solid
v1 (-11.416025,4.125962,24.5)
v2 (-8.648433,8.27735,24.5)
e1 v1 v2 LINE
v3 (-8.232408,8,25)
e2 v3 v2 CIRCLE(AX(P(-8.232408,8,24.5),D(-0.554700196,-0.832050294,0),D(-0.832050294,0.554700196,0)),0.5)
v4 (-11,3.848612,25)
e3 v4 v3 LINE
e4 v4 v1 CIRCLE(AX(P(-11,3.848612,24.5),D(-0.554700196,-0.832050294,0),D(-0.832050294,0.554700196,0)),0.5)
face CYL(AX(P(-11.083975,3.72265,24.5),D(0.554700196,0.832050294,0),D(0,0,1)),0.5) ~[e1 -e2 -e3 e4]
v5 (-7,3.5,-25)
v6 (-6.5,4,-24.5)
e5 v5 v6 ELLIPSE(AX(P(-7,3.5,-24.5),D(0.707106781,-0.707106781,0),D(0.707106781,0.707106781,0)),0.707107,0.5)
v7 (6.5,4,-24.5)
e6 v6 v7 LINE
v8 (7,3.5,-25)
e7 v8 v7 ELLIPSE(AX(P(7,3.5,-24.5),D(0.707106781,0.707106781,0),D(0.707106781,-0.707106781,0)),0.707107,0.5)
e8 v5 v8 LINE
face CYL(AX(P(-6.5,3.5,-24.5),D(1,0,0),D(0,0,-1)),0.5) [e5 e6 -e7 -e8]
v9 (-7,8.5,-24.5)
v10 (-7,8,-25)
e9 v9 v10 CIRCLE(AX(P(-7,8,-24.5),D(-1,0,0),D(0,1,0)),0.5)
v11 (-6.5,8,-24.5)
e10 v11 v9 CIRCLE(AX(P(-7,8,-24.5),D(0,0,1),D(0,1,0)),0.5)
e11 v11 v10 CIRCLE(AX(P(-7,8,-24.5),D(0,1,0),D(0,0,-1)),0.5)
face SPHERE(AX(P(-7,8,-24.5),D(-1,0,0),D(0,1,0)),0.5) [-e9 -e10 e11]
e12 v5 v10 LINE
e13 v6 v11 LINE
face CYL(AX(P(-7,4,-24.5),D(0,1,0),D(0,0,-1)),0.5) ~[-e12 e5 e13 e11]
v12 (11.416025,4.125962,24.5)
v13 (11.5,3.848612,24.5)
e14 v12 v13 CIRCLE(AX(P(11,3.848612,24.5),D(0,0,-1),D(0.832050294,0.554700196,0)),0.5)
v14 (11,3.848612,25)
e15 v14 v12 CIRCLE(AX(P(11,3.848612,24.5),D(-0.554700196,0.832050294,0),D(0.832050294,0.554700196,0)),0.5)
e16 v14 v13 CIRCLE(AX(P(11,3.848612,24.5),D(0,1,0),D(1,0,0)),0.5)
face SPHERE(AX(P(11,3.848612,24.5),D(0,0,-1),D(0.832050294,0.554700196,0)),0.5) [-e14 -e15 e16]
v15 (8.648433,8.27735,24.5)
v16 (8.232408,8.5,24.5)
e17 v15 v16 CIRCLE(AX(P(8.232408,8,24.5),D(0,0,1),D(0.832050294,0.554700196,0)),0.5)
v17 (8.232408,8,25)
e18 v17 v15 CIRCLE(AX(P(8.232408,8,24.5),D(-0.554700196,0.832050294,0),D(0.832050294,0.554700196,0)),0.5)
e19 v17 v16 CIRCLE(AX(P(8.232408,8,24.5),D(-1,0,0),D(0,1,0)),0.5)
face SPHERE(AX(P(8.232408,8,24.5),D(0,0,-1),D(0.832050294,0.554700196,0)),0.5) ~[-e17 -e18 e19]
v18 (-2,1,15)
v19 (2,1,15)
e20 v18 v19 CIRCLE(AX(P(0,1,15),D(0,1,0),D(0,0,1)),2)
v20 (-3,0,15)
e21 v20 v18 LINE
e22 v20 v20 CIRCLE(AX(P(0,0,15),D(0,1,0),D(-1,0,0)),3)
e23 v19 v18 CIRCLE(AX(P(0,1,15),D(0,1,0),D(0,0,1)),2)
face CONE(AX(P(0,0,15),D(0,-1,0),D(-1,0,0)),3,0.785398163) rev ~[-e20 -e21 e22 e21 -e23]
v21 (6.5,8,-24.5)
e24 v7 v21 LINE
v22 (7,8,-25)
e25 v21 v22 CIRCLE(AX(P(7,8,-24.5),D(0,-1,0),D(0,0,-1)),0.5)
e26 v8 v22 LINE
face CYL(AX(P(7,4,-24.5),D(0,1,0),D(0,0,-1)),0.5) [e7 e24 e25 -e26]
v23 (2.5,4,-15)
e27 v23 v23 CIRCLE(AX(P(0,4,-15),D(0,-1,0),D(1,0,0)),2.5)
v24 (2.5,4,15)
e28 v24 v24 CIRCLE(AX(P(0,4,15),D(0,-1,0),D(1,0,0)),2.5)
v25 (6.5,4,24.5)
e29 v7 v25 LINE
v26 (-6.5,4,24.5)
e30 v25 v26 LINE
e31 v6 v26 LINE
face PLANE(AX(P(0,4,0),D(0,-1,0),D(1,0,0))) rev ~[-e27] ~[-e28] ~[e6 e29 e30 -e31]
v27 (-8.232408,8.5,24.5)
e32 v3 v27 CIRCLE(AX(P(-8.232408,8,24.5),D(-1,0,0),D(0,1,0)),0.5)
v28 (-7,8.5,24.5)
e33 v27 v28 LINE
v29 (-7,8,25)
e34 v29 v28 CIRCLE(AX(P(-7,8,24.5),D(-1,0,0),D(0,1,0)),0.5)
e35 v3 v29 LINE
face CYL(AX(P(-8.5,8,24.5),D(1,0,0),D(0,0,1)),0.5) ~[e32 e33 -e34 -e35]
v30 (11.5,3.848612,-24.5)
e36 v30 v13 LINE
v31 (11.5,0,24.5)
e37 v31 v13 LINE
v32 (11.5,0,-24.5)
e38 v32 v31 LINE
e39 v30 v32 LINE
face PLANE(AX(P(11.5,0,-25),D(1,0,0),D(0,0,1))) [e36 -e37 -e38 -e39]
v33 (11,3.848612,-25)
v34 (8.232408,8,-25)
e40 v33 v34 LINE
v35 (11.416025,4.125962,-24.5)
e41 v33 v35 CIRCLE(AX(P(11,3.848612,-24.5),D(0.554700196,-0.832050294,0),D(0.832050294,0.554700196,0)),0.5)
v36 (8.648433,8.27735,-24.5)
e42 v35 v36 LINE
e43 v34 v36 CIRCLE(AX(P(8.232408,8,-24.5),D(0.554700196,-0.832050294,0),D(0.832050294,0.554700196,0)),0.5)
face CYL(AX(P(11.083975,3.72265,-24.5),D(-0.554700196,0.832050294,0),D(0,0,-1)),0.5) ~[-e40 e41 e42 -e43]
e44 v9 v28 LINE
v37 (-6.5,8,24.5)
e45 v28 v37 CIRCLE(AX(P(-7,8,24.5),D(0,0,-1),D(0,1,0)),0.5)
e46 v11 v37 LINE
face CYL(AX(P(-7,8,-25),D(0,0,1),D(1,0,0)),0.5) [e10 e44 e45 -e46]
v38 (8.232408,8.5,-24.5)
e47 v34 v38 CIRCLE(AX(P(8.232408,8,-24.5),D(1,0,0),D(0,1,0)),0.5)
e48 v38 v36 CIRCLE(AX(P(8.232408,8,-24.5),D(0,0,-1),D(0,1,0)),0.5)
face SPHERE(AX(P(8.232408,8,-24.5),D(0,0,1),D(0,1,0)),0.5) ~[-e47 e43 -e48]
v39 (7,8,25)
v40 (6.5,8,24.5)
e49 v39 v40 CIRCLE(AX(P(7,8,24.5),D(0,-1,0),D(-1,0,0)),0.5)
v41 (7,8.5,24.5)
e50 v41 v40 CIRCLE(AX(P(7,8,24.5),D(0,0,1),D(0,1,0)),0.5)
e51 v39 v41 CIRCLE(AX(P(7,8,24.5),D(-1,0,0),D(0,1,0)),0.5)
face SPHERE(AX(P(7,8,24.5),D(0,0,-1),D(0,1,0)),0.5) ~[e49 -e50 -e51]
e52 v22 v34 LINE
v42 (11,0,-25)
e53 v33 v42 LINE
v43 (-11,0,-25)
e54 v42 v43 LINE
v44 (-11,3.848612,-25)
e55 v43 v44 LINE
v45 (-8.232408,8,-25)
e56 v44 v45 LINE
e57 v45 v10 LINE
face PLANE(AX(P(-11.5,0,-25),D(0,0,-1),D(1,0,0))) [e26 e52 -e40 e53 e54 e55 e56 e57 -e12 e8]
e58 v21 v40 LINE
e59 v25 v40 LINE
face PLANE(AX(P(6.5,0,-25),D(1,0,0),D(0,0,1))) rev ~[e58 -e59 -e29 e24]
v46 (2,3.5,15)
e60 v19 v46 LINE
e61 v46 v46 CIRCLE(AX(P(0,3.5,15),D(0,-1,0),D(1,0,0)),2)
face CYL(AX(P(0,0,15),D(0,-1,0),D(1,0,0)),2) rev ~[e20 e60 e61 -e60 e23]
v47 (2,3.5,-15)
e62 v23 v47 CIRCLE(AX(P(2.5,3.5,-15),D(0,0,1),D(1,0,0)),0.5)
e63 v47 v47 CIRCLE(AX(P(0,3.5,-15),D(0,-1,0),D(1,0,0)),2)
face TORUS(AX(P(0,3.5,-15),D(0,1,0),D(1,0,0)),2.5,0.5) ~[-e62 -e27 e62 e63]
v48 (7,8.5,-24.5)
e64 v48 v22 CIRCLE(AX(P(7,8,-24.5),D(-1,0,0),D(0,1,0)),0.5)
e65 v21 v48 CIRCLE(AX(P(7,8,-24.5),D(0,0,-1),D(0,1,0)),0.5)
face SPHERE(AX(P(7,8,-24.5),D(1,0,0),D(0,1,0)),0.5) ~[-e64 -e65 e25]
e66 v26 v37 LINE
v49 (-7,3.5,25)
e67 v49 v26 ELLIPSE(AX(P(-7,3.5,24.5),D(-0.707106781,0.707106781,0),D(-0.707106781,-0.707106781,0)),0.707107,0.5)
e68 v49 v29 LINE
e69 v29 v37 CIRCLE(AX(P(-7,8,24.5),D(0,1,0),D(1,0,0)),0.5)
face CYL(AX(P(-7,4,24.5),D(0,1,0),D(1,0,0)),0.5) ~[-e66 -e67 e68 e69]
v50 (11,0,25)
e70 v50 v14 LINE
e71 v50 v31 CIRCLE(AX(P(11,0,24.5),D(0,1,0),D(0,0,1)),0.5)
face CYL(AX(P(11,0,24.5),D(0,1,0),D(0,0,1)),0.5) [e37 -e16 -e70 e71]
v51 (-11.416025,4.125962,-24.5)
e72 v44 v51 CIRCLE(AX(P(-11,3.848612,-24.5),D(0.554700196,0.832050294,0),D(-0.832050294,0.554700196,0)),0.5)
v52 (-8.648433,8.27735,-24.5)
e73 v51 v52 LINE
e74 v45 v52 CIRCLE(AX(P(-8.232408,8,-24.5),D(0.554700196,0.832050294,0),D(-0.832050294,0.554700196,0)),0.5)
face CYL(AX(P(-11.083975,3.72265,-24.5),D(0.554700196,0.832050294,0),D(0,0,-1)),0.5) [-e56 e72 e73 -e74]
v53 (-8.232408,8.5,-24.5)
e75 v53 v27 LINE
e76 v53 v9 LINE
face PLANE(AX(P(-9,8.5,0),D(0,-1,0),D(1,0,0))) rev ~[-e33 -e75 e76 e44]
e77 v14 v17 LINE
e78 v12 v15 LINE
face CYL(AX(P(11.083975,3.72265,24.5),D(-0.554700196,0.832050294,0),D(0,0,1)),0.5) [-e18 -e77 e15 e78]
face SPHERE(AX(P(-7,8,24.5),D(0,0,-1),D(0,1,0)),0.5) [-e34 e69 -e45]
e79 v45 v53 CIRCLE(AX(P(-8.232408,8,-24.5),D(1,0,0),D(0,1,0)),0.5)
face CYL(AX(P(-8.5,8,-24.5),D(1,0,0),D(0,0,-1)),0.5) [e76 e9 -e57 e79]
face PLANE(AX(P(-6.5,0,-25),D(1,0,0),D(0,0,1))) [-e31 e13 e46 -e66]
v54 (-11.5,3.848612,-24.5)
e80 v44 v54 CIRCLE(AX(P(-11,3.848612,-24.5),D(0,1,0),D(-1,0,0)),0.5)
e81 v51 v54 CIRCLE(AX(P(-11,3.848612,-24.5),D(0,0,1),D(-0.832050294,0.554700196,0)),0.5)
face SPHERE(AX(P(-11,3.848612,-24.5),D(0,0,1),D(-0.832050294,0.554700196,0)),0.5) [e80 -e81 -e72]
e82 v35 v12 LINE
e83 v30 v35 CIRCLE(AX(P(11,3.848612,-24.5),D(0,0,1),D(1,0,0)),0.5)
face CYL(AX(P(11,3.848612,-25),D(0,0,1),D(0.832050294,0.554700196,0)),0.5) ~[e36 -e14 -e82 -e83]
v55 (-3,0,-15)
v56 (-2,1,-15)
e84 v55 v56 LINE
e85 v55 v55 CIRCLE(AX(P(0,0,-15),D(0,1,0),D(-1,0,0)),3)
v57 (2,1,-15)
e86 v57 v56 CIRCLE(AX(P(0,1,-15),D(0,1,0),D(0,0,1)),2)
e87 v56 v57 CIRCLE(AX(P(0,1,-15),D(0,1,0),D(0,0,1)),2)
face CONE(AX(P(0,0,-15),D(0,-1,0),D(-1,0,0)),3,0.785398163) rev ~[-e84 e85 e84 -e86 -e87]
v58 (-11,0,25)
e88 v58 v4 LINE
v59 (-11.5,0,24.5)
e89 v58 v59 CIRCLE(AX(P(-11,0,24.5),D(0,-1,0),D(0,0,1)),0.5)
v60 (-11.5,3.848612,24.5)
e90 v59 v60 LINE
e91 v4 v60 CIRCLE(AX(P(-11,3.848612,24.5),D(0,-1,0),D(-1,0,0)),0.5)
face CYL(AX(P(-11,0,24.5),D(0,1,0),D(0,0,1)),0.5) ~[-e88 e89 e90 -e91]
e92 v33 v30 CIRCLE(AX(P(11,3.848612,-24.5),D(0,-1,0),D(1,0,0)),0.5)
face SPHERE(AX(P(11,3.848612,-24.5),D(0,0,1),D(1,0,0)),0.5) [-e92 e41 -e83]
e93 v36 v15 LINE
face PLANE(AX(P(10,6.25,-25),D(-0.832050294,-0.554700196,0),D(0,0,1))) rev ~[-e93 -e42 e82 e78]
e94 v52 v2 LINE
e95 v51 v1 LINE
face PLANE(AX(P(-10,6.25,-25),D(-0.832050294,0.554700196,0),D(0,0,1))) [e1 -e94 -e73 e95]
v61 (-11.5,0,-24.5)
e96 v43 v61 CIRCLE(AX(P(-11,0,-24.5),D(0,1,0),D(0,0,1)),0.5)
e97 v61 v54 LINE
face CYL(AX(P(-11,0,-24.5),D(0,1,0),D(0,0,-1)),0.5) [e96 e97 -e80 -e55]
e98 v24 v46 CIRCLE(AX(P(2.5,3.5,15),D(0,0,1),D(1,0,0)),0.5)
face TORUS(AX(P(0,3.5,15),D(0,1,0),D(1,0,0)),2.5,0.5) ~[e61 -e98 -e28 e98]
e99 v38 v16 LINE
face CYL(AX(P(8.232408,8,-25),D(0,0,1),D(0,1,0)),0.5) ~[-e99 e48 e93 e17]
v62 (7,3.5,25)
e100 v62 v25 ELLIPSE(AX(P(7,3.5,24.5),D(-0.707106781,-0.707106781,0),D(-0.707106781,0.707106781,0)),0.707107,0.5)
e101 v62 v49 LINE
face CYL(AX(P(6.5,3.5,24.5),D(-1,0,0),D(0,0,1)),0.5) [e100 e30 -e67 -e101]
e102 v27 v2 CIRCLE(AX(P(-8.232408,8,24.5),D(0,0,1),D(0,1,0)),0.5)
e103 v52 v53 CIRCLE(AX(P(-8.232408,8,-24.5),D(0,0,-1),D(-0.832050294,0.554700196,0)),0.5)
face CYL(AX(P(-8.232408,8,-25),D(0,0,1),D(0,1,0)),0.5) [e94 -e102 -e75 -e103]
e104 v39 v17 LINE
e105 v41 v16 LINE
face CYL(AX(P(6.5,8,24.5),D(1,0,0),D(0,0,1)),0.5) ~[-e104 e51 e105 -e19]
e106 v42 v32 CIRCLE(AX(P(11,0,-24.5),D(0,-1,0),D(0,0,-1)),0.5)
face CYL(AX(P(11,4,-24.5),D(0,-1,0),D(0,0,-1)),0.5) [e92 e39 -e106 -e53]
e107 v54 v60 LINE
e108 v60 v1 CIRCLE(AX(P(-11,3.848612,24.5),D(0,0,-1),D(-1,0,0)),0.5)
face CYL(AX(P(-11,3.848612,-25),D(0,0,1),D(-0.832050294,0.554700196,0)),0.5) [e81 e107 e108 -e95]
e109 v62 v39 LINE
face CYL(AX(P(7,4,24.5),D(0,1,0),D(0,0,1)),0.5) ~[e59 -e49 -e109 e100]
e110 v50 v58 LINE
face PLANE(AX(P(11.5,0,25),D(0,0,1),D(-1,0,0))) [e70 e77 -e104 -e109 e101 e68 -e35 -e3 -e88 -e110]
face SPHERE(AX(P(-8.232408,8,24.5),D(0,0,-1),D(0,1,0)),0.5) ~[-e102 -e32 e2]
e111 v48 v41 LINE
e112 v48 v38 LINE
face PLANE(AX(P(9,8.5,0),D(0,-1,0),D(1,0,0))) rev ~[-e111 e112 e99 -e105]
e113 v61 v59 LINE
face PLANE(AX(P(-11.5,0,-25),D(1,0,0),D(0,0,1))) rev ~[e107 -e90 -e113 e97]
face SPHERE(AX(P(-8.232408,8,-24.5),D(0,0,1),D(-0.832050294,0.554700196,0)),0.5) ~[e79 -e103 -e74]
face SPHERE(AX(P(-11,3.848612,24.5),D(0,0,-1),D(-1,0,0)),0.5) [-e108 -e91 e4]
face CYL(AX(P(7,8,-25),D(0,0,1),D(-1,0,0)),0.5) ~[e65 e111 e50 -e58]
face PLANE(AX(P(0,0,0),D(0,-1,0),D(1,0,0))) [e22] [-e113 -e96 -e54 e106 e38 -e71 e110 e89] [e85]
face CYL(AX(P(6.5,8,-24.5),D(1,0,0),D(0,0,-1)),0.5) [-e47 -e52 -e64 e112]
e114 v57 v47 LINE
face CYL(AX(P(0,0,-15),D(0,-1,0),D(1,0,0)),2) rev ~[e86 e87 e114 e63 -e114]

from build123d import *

# Parameters (mm, degrees)
F0_W           = 12
F0_H           = 50
F0_R           = 2
F0_W_2         = 0.5
F0_W_3         = 5
F1_DEPTH       = 4
F2_DEPTH       = 8.5
F3_SIZE2       = 3
F3_SIZE        = 4.5
F4_SIZE2       = 3
F4_SIZE        = 4.5
F5_D           = 4
F5_CSINK_D     = 6
F5_CSINK_ANGLE = 90
F6_R           = 0.5


with BuildPart() as f1:
    # F0 (on Front) → F1 (new body)
    with BuildSketch(Plane.XZ):
        Rectangle(F0_W, F0_H)
        with Locations((0, -15)):
            Circle(F0_R, mode=Mode.SUBTRACT)
        with Locations((0, 15)):
            Circle(F0_R, mode=Mode.SUBTRACT)
        with Locations((6.25, 0)):
            Rectangle(F0_W_2, F0_H)
        with Locations((-6.25, 0)):
            Rectangle(F0_W_2, F0_H)
        with Locations((9, 0)):
            Rectangle(F0_W_3, F0_H)
        with Locations((-9, 0)):
            Rectangle(F0_W_3, F0_H)
    extrude(amount=-F1_DEPTH)

    # F0 (on Front) → F2 (join)
    with BuildSketch(Plane.XZ):
        with Locations((-9, 0)):
            Rectangle(F0_W_3, F0_H)
        with Locations((9, 0)):
            Rectangle(F0_W_3, F0_H)
    extrude(amount=-F2_DEPTH)

    # F3
    f3_edges = [f1.edges().sort_by_distance(p)[0] for p in [
        (-11.5, 8.5, 0),
    ]]
    f3_side = f1.faces().sort_by_distance((-11.5, 4.25, 0))[0]
    chamfer(f3_edges, length=F3_SIZE, length2=F3_SIZE2, reference=f3_side)

    # F4
    f4_edges = [f1.edges().sort_by_distance(p)[0] for p in [
        (11.5, 8.5, 0),
    ]]
    f4_side = f1.faces().sort_by_distance((11.5, 4.25, 0))[0]
    chamfer(f4_edges, length=F4_SIZE, length2=F4_SIZE2, reference=f4_side)

    # F5 (through all)
    with Locations(Plane.XZ):
        with Locations((0, 15), (0, -15)):
            CounterSinkHole(F5_D / 2, F5_CSINK_D / 2, counter_sink_angle=F5_CSINK_ANGLE)

    # F6
    f6_edges = [f1.edges().sort_by_distance(p)[0] for p in [
        (10, 6.25, -25),
        (11.5, 4, 0),
        (8.5, 8.5, 0),
        (10, 6.25, 25),
        (7.5, 8.5, -25),
        (6.5, 8.5, 0),
        (7.5, 8.5, 25),
        (-7.5, 8.5, -25),
        (-8.5, 8.5, 0),
        (-6.5, 8.5, 0),
        (-7.5, 8.5, 25),
        (-10, 6.25, 25),
        (-11.5, 4, 0),
        (-10, 6.25, -25),
        (-2, 4, -15),
        (-2, 4, 15),
        (0, 4, -25),
        (6.5, 6.25, -25),
        (-6.5, 6.25, -25),
        (-11.5, 2, -25),
        (11.5, 2, -25),
        (11.5, 2, 25),
        (6.5, 6.25, 25),
        (0, 4, 25),
        (-6.5, 6.25, 25),
        (-11.5, 2, 25),
    ]]
    fillet(f6_edges, radius=F6_R)


solid = f1.part
